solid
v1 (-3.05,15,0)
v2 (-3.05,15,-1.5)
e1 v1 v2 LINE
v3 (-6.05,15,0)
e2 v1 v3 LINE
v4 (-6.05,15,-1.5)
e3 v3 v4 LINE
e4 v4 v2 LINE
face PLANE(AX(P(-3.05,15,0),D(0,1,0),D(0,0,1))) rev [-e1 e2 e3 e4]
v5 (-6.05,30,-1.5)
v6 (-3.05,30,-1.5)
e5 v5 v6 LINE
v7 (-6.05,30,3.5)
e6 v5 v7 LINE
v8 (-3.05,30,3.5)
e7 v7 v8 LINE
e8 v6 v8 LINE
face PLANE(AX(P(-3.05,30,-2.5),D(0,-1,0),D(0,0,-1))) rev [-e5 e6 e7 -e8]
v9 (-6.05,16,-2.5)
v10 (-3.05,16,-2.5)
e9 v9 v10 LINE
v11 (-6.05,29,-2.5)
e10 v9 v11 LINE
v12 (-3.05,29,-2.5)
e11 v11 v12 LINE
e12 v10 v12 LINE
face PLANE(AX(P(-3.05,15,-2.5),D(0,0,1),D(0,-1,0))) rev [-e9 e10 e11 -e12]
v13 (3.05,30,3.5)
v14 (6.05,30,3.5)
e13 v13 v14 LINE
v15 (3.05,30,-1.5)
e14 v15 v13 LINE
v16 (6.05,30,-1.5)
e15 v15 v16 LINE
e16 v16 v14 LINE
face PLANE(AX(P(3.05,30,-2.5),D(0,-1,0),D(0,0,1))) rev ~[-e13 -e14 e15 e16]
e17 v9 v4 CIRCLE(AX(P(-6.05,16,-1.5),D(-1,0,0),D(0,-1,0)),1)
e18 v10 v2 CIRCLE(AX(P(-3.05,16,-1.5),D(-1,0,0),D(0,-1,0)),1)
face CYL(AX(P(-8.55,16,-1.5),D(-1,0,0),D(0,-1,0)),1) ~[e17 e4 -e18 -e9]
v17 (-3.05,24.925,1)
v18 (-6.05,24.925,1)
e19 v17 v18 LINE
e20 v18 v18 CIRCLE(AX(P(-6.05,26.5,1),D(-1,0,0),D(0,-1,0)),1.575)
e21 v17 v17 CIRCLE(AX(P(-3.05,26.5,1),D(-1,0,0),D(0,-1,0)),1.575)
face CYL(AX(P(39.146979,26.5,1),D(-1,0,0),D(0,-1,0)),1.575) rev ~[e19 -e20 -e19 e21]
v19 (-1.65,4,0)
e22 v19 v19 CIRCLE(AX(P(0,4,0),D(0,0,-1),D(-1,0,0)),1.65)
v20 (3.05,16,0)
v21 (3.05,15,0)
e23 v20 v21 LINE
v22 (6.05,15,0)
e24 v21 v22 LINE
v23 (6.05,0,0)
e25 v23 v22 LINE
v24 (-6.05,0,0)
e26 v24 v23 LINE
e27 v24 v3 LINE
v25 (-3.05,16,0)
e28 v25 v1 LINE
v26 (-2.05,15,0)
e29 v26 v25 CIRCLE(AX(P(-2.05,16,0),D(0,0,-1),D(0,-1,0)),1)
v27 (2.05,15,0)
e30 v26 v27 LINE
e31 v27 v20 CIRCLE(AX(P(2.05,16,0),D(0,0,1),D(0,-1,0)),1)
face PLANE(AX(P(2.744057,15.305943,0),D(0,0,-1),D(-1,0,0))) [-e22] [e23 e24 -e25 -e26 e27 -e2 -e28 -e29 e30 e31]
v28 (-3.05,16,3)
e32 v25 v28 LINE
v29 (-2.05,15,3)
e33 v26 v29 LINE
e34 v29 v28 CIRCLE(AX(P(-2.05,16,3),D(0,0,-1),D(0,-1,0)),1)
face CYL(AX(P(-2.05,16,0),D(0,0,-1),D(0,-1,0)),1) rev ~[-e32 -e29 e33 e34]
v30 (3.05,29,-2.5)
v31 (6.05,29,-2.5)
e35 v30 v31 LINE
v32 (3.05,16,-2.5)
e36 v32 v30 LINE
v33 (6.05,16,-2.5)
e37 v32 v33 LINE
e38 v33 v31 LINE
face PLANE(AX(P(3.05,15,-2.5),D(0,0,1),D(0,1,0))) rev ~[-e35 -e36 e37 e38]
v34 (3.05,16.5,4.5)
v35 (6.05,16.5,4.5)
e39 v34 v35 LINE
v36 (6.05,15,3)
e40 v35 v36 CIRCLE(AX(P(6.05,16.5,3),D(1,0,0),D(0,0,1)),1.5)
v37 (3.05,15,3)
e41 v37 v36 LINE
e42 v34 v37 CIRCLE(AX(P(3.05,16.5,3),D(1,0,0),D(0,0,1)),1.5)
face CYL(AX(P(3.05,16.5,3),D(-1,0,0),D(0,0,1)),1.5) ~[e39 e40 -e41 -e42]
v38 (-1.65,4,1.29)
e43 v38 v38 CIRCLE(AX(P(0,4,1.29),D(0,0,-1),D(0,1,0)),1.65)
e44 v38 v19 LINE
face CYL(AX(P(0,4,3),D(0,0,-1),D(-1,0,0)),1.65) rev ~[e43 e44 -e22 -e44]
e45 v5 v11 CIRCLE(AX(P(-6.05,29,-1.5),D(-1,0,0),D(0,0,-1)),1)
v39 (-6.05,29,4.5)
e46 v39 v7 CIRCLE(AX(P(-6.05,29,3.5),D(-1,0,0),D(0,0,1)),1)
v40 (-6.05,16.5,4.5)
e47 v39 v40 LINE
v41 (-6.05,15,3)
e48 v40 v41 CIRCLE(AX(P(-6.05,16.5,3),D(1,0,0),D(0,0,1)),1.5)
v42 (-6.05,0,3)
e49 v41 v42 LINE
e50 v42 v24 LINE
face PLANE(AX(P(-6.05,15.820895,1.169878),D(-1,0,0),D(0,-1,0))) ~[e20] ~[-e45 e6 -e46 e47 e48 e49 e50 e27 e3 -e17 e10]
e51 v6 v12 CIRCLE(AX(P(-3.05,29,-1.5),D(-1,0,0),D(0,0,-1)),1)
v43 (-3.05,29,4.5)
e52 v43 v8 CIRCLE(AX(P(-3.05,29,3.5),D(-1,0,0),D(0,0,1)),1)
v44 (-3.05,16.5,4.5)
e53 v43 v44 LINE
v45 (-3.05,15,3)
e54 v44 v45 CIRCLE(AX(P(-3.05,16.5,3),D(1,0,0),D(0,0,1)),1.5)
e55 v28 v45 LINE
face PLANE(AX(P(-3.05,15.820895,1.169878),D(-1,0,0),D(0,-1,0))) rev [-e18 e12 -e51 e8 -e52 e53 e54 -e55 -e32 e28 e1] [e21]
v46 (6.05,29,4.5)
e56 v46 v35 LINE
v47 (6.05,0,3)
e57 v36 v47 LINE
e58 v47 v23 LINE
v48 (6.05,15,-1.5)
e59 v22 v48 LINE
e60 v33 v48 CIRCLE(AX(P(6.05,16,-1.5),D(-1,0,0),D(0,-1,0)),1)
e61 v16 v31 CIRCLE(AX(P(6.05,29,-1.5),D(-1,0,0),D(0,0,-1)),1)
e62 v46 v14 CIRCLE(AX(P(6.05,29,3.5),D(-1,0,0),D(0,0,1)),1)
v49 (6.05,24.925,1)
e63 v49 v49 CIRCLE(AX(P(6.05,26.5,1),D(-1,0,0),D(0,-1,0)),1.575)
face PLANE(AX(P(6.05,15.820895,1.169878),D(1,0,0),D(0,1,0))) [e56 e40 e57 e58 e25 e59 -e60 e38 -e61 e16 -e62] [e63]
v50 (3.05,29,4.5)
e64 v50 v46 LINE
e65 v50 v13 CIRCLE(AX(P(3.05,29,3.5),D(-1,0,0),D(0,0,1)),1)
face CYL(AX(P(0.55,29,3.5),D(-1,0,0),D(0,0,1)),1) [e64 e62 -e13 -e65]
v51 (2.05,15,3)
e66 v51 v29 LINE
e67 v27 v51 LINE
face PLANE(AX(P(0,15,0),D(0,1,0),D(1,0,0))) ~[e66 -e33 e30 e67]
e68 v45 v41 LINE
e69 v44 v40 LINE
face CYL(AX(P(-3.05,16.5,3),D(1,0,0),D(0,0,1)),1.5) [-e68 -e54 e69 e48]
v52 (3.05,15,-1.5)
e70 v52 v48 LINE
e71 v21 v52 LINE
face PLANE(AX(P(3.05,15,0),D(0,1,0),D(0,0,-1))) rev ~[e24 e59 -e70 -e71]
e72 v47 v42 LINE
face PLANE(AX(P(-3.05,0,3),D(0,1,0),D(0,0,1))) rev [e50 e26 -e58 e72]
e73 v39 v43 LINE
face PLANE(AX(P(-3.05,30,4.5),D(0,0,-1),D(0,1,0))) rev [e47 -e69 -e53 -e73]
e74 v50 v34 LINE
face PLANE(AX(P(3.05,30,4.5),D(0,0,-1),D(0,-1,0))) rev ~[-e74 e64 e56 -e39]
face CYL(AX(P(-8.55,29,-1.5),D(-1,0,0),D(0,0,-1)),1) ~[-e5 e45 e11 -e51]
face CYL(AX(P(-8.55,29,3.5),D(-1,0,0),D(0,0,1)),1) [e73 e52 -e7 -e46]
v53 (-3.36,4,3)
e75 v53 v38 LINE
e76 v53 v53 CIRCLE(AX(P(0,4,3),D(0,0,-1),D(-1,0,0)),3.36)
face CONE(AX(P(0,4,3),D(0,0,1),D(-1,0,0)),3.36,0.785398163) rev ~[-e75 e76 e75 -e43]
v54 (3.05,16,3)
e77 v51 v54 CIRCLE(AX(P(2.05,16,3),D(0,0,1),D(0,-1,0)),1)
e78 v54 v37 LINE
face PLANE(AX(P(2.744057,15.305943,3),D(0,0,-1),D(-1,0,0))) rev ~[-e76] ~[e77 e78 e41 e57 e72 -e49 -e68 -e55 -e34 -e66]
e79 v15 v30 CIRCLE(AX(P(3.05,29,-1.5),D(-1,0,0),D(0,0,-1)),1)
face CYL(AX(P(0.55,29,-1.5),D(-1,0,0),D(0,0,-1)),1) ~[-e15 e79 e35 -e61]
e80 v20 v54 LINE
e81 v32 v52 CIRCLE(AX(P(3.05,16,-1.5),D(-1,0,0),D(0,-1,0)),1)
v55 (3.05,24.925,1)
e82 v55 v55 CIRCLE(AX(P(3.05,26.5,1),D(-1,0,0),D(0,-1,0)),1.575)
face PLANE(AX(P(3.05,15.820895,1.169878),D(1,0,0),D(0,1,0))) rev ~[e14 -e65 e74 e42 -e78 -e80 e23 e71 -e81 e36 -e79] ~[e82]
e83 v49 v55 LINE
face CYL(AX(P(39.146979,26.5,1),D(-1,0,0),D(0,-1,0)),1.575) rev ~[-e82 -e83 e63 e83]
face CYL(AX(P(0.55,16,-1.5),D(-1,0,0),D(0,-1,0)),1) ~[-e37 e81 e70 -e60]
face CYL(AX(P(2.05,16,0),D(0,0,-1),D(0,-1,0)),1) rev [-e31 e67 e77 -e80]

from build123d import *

# Parameters (mm, degrees)
F0_W           = 3.05
F0_H           = 15
F1_DEPTH       = 3
F3_DEPTH       = 3
F6_D           = 3.3
F6_CSINK_D     = 6.72
F6_CSINK_ANGLE = 90
F8_D           = 3.15
F9_T1_DEPTH    = 3
F9_T3_DEPTH    = 8
F9_T5_DEPTH    = 8


# Not quite as in the source:
# - a fillet or chamfer that OpenCascade refuses, or shapes differently, is made with other operations: its cross-section is extruded or revolved along the edge and cut away or added


with BuildPart() as f1:
    # F0 (on Top) → F1 (new body)
    with BuildSketch(Plane.XY):
        with Locations((1.525, 7.5)):
            Rectangle(F0_W, F0_H)
    extrude(amount=F1_DEPTH)

    # F2 (on face) → F3 (join)
    with BuildSketch(Plane.YZ.offset(3.05)):
        with BuildLine():
            Line((0, 3), (0, 0))
            Line((0, 0), (15, 0))
            Line((15, 0), (15, -2.5))
            Line((15, -2.5), (30, -2.5))
            Line((30, -2.5), (30, 4.5))
            Line((30, 4.5), (16.5, 4.5))
            ThreePointArc((16.5, 4.5), (15.4393398282, 4.0606601718), (15, 3))
            Line((15, 3), (0, 3))
        make_face()
    extrude(amount=F3_DEPTH)

    # F4: F1 across face


with BuildPart() as f1_1:
    add(f1.part)
    add(f1.part.mirror(Plane(origin=(0, 7.5, 1.5), x_dir=(0, -1, 0), z_dir=(-1, 0, 0))))

    # F6 (through all)
    with Locations(Plane.XY.offset(3)):
        with Locations((0, 4)):
            CounterSinkHole(F6_D / 2, F6_CSINK_D / 2, counter_sink_angle=F6_CSINK_ANGLE)

    # F8 (through all)
    with Locations(Plane.YZ.offset(6.05)):
        with Locations((26.5, 1)):
            Hole(F8_D / 2)

    # F9: fillet of radius 1 on 8 edges, made by hand

    # F9_s2 → F9_t1 (join)
    with BuildSketch(Plane.XY):
        with BuildLine():
            ThreePointArc((2.05, 15), (2.7571067812, 15.2928932188), (3.05, 16))
            Line((3.05, 16), (3.05, 15))
            Line((3.05, 15), (2.05, 15))
        make_face()
        with BuildLine():
            ThreePointArc((-2.05, 15), (-2.7571067812, 15.2928932188), (-3.05, 16))
            Line((-3.05, 16), (-3.05, 15))
            Line((-3.05, 15), (-2.05, 15))
        make_face()
    extrude(amount=F9_T1_DEPTH)

    # F9_s4 → F9_t3 (cut)
    with BuildSketch(Plane.YZ.offset(0.55)):
        with BuildLine():
            ThreePointArc((29, 4.5), (29.7071067812, 4.2071067812), (30, 3.5))
            Line((30, 3.5), (30, 4.5))
            Line((30, 4.5), (29, 4.5))
        make_face()
        with BuildLine():
            ThreePointArc((29, -2.5), (29.7071067812, -2.2071067812), (30, -1.5))
            Line((30, -1.5), (30, -2.5))
            Line((30, -2.5), (29, -2.5))
        make_face()
        with BuildLine():
            ThreePointArc((15, -1.5), (15.2928932188, -2.2071067812), (16, -2.5))
            Line((16, -2.5), (15, -2.5))
            Line((15, -2.5), (15, -1.5))
        make_face()
    extrude(amount=F9_T3_DEPTH, mode=Mode.SUBTRACT)

    # F9_s6 → F9_t5 (cut)
    with BuildSketch(Plane.YZ.offset(-8.55)):
        with BuildLine():
            ThreePointArc((29, 4.5), (29.7071067812, 4.2071067812), (30, 3.5))
            Line((30, 3.5), (30, 4.5))
            Line((30, 4.5), (29, 4.5))
        make_face()
        with BuildLine():
            ThreePointArc((29, -2.5), (29.7071067812, -2.2071067812), (30, -1.5))
            Line((30, -1.5), (30, -2.5))
            Line((30, -2.5), (29, -2.5))
        make_face()
        with BuildLine():
            ThreePointArc((15, -1.5), (15.2928932188, -2.2071067812), (16, -2.5))
            Line((16, -2.5), (15, -2.5))
            Line((15, -2.5), (15, -1.5))
        make_face()
    extrude(amount=F9_T5_DEPTH, mode=Mode.SUBTRACT)


solid = f1_1.part
